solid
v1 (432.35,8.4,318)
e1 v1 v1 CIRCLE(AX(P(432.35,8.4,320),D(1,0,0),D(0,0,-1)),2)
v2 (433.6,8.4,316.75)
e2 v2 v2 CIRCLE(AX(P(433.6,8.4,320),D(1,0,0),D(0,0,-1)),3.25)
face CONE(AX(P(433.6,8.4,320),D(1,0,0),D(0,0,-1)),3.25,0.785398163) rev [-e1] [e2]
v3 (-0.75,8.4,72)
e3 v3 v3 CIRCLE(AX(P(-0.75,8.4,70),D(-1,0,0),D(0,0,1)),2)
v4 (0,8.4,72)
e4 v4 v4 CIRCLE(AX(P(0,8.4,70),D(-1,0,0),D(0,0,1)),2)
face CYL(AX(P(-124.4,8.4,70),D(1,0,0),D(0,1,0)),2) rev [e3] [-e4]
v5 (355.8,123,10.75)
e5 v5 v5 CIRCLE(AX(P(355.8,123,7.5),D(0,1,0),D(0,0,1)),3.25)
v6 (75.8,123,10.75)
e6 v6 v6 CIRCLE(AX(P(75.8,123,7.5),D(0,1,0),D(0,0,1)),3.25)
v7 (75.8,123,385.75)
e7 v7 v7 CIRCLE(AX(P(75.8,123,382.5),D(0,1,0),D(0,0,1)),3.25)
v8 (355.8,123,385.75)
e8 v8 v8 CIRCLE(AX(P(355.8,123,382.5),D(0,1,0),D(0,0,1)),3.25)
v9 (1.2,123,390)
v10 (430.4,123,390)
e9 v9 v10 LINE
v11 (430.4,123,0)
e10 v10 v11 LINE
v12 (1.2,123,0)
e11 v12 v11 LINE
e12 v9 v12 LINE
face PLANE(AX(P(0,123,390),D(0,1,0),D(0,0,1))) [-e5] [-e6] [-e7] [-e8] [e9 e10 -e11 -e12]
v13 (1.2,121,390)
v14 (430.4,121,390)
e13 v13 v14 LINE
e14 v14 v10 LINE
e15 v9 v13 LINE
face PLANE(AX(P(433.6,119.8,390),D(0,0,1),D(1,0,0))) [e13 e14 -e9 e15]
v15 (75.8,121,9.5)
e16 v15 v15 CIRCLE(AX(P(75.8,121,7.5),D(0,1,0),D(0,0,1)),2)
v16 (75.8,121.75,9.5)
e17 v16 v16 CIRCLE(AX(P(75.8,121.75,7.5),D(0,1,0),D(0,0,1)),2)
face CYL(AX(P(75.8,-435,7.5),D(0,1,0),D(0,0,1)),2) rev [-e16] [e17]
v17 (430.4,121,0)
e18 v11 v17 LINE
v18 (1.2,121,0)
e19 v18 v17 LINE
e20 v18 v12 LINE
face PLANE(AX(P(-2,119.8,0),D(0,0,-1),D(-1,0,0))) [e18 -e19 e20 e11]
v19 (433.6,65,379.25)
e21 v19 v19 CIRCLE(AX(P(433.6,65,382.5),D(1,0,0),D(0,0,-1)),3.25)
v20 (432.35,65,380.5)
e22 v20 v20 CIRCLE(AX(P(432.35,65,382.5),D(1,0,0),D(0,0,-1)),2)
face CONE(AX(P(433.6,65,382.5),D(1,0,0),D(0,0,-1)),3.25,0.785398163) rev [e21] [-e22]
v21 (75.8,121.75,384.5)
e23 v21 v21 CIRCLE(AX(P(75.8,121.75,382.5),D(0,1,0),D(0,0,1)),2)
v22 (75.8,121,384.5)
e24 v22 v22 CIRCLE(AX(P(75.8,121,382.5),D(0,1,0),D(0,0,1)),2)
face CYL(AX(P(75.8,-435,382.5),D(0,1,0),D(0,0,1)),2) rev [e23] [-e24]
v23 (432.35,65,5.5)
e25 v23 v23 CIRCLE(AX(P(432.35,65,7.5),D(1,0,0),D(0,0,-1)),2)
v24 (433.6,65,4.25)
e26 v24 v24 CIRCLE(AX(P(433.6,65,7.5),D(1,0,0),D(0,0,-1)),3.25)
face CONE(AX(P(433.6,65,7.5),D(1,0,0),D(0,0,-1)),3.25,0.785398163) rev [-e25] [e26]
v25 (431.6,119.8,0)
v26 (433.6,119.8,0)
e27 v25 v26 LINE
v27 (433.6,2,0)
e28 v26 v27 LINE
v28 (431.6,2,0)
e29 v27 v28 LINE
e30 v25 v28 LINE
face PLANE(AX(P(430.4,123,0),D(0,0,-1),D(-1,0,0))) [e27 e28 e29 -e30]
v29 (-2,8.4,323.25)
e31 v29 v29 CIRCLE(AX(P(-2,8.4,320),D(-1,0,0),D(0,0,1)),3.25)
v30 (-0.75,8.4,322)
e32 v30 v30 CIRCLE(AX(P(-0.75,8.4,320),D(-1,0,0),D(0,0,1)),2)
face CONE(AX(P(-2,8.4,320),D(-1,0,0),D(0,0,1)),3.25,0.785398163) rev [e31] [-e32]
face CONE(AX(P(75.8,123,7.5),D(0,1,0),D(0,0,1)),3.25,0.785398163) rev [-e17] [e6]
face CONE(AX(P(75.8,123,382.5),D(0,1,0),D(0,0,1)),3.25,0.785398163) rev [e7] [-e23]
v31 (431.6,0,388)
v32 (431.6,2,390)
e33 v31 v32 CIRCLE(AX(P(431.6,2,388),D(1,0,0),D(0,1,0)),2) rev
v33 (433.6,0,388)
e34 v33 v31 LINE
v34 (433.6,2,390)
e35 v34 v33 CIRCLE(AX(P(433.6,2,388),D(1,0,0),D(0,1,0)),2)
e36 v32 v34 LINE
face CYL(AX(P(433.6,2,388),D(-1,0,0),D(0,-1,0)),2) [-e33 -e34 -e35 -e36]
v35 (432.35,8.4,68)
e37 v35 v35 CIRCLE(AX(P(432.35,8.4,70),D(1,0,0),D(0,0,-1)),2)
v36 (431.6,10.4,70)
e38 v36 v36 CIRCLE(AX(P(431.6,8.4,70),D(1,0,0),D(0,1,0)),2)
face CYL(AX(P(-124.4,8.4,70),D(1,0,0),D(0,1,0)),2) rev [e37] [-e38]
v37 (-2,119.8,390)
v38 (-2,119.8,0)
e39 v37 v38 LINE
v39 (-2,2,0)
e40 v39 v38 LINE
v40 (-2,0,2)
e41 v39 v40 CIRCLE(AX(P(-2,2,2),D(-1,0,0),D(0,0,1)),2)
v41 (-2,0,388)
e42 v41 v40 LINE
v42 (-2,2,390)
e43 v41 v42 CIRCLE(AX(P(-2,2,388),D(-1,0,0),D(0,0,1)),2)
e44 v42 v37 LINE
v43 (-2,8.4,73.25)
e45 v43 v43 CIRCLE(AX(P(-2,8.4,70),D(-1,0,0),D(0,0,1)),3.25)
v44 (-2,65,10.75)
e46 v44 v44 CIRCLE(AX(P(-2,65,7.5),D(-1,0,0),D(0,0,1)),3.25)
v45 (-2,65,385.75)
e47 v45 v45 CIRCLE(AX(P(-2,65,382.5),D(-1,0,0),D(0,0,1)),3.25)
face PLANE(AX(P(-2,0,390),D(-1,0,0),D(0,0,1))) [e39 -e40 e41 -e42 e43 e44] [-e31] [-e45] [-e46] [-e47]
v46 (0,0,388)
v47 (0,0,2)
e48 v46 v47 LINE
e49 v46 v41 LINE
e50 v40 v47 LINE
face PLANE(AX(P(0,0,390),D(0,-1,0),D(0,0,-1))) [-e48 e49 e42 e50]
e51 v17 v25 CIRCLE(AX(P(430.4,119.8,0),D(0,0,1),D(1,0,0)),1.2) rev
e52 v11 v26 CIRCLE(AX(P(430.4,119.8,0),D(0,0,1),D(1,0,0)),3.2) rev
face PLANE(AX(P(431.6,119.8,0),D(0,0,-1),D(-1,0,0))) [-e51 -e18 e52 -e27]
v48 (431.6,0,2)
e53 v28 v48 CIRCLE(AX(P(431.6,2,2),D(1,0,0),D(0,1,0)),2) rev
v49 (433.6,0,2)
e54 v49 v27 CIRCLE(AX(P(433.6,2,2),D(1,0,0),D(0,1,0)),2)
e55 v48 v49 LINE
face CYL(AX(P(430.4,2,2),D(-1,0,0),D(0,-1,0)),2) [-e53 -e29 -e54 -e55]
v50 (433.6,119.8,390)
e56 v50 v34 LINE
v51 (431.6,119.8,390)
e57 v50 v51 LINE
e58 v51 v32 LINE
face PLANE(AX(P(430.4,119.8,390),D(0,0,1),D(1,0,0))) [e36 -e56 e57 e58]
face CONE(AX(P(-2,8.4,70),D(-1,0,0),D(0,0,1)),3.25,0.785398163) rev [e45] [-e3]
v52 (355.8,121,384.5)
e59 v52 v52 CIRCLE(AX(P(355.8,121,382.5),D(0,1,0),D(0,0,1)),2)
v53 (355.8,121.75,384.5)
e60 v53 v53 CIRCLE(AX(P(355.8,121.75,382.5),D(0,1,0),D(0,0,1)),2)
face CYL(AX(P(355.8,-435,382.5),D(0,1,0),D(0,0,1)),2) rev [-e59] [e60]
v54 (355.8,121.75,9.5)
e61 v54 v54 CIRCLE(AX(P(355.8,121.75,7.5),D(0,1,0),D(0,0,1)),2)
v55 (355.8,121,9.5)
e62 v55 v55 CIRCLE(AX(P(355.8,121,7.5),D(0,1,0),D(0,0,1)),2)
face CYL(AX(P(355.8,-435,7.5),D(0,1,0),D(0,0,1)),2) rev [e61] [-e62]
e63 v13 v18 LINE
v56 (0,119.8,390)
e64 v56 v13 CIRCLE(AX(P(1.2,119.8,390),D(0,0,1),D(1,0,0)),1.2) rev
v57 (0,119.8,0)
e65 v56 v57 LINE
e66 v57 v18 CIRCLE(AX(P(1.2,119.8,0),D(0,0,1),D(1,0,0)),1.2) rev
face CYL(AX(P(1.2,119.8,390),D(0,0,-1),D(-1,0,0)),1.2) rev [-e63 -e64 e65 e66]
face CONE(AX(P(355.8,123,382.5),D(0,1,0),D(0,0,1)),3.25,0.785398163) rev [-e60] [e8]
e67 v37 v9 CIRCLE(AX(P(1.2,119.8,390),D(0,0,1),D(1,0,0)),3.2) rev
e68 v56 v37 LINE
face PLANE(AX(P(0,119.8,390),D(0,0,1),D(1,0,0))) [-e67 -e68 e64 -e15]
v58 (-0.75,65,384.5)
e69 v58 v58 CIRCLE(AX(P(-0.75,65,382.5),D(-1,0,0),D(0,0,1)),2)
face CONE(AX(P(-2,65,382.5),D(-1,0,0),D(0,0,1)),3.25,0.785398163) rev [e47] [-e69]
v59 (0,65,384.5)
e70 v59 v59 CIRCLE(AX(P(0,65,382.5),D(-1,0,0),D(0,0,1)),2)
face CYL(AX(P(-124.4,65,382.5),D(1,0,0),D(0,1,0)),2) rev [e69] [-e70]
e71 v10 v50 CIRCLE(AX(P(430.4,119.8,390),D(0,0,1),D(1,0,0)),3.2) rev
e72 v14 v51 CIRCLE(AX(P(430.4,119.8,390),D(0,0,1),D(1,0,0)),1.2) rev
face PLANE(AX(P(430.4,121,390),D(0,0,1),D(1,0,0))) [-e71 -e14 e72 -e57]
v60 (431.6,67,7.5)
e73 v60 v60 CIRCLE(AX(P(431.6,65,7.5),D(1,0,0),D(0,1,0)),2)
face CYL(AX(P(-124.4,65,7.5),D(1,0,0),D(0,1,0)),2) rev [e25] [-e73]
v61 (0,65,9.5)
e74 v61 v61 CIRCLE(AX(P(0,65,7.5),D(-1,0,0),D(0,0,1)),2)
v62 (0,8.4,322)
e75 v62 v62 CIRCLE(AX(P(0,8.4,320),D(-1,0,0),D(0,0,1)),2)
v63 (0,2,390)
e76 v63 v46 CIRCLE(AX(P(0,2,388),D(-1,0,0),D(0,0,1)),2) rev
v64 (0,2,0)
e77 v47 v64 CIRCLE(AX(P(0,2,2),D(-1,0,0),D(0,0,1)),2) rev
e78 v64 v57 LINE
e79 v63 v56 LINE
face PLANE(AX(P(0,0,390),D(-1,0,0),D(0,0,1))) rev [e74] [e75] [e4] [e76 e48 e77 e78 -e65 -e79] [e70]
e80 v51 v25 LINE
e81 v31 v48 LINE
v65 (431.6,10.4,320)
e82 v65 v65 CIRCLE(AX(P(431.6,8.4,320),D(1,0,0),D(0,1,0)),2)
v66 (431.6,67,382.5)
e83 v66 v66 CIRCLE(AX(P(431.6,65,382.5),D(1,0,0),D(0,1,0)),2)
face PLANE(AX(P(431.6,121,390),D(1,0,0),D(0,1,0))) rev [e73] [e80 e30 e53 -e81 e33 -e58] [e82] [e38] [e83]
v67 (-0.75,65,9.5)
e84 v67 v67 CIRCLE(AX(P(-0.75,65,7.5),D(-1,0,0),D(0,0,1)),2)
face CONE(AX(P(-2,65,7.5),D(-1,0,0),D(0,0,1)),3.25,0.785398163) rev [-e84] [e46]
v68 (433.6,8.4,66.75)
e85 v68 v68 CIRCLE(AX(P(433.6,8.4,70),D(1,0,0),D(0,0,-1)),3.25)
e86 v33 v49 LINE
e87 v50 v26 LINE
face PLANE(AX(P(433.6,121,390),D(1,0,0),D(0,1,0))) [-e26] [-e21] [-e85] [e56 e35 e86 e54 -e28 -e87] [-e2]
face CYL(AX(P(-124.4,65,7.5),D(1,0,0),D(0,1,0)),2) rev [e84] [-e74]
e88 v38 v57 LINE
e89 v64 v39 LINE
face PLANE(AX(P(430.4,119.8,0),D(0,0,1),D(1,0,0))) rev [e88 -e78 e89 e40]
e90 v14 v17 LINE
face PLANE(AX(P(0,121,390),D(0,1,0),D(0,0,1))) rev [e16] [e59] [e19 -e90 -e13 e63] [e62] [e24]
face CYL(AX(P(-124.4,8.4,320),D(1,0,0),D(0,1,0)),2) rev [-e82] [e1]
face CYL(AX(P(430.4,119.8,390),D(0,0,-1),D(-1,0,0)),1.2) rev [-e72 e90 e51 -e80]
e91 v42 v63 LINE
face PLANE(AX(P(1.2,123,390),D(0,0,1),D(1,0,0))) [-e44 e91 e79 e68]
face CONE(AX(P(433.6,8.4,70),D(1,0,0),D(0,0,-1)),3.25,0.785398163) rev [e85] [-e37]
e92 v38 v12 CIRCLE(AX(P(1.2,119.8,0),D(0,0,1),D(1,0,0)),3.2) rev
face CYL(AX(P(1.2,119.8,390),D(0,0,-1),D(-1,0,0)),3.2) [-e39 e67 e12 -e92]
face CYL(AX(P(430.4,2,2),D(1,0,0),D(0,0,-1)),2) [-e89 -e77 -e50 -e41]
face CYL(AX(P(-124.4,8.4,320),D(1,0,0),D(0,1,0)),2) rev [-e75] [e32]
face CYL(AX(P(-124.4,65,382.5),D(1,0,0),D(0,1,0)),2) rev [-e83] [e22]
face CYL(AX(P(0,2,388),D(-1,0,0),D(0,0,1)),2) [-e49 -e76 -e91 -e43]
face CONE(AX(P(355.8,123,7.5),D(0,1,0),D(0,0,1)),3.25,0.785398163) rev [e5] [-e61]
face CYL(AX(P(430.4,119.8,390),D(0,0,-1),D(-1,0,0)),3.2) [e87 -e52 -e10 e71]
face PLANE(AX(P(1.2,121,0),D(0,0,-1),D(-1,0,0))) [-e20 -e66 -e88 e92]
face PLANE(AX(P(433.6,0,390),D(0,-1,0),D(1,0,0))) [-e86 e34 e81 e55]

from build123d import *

# Parameters (mm, degrees)
FLANGE_BASE1_DEPTH                   = 390
ESBO_O6_R                            = 2
CORTE_EXTRUS_O1_DEPTH                = 558
ESBO_O7_R                            = 2
CORTE_EXTRUS_O2_DEPTH                = 558
QUEBRA_CANTO1_START                  = -2
QUEBRA_CANTO1_DEPTH                  = 435.6
ESCAREADO_PARA_SFHCS_M41_D           = 4
ESCAREADO_PARA_SFHCS_M41_CSINK_D     = 6.5
ESCAREADO_PARA_SFHCS_M41_CSINK_ANGLE = 90
ESCAREADO_PARA_SFHCS_M42_D           = 4
ESCAREADO_PARA_SFHCS_M42_CSINK_D     = 6.5
ESCAREADO_PARA_SFHCS_M42_CSINK_ANGLE = 90
ESCAREADO_PARA_SFHCS_M43_D           = 4
ESCAREADO_PARA_SFHCS_M43_CSINK_D     = 6.5
ESCAREADO_PARA_SFHCS_M43_CSINK_ANGLE = 90


# Read off the part's stored shape, not the designer's step: Quebra-Canto1
# Sheet-metal steps are written as plain solids
with BuildPart() as part:
    # Esboço1 → Flange-base1 (new body)
    with BuildSketch(Plane.XY):
        with BuildLine():
            Line((0, 0), (0, 119.8))
            ThreePointArc((0, 119.8), (0.351471863, 120.648528137), (1.2, 121))
            Line((1.2, 121), (430.4, 121))
            ThreePointArc((430.4, 121), (431.248528137, 120.648528137), (431.6, 119.8))
            Line((431.6, 119.8), (431.6, 0))
            Line((431.6, 0), (433.6, 0))
            Line((433.6, 0), (433.6, 119.8))
            ThreePointArc((433.6, 119.8), (432.6627417, 122.0627417), (430.4, 123))
            Line((430.4, 123), (1.2, 123))
            ThreePointArc((1.2, 123), (-1.0627417, 122.0627417), (-2, 119.8))
            Line((-2, 119.8), (-2, 0))
            Line((-2, 0), (0, 0))
        make_face()
    extrude(amount=FLANGE_BASE1_DEPTH)

    # Esboço6 → Corte-extrusão1 (cut)
    with BuildSketch(Plane(origin=(433.6, 0, 0), x_dir=(0, 0, -1), z_dir=(1, 0, 0))):
        with Locations(Location((-382.5, 65, 0), (0, 0, 180))):
            Circle(ESBO_O6_R)
        with Locations(Location((-320, 8.4, 0), (0, 0, 180))):
            Circle(ESBO_O6_R)
        with Locations(Location((-70, 8.4, 0), (0, 0, 180))):
            Circle(ESBO_O6_R)
        with Locations(Location((-7.5, 65, 0), (0, 0, 180))):
            Circle(ESBO_O6_R)
    extrude(amount=-CORTE_EXTRUS_O1_DEPTH, mode=Mode.SUBTRACT)

    # Esboço7 → Corte-extrusão2 (cut)
    with BuildSketch(Plane(origin=(0, 123, 0), x_dir=(1, 0, 0), z_dir=(0, 1, 0))):
        with Locations(Location((75.8, -7.5, 0), (0, 0, 270))):
            Circle(ESBO_O7_R)
        with Locations(Location((355.8, -7.5, 0), (0, 0, 270))):
            Circle(ESBO_O7_R)
        with Locations(Location((355.8, -382.5, 0), (0, 0, 270))):
            Circle(ESBO_O7_R)
        with Locations(Location((75.8, -382.5, 0), (0, 0, 270))):
            Circle(ESBO_O7_R)
    extrude(amount=-CORTE_EXTRUS_O2_DEPTH, mode=Mode.SUBTRACT)

    # Quebra-Canto1 outline → Quebra-Canto1 (cut)
    with BuildSketch(Plane.YZ.offset(QUEBRA_CANTO1_START)):
        with BuildLine():
            Line((0, 390), (0, 388))
            ThreePointArc((0, 388), (0.585786438, 389.414213562), (2, 390))
            Line((2, 390), (0, 390))
        make_face()
        with BuildLine():
            ThreePointArc((2, 0), (0.585786438, 0.585786438), (0, 2))
            Line((0, 2), (0, 0))
            Line((0, 0), (2, 0))
        make_face()
    extrude(amount=QUEBRA_CANTO1_DEPTH, mode=Mode.SUBTRACT)

    # Escareado para SFHCS M41 (through all)
    with Locations(Plane(origin=(0, 123, 0), x_dir=(1, 0, 0), z_dir=(0, 1, 0))):
        with Locations((75.8, -382.5), (355.8, -382.5), (355.8, -7.5), (75.8, -7.5)):
            CounterSinkHole(ESCAREADO_PARA_SFHCS_M41_D / 2, ESCAREADO_PARA_SFHCS_M41_CSINK_D / 2, counter_sink_angle=ESCAREADO_PARA_SFHCS_M41_CSINK_ANGLE)

    # Escareado para SFHCS M42 (through all)
    with Locations(Plane.ZY.offset(2)):
        with Locations((382.5, 65), (320, 8.4), (7.5, 65), (70, 8.4)):
            CounterSinkHole(ESCAREADO_PARA_SFHCS_M42_D / 2, ESCAREADO_PARA_SFHCS_M42_CSINK_D / 2, counter_sink_angle=ESCAREADO_PARA_SFHCS_M42_CSINK_ANGLE)

    # Escareado para SFHCS M43 (through all)
    with Locations(Plane(origin=(433.6, 65, 382.5), x_dir=(0, 1, 0), z_dir=(1, 0, 0))):
        with Locations((0, 0), (-56.6, -62.5), (-56.6, -312.5), (0, -375)):
            CounterSinkHole(ESCAREADO_PARA_SFHCS_M43_D / 2, ESCAREADO_PARA_SFHCS_M43_CSINK_D / 2, counter_sink_angle=ESCAREADO_PARA_SFHCS_M43_CSINK_ANGLE)


solid = part.part
